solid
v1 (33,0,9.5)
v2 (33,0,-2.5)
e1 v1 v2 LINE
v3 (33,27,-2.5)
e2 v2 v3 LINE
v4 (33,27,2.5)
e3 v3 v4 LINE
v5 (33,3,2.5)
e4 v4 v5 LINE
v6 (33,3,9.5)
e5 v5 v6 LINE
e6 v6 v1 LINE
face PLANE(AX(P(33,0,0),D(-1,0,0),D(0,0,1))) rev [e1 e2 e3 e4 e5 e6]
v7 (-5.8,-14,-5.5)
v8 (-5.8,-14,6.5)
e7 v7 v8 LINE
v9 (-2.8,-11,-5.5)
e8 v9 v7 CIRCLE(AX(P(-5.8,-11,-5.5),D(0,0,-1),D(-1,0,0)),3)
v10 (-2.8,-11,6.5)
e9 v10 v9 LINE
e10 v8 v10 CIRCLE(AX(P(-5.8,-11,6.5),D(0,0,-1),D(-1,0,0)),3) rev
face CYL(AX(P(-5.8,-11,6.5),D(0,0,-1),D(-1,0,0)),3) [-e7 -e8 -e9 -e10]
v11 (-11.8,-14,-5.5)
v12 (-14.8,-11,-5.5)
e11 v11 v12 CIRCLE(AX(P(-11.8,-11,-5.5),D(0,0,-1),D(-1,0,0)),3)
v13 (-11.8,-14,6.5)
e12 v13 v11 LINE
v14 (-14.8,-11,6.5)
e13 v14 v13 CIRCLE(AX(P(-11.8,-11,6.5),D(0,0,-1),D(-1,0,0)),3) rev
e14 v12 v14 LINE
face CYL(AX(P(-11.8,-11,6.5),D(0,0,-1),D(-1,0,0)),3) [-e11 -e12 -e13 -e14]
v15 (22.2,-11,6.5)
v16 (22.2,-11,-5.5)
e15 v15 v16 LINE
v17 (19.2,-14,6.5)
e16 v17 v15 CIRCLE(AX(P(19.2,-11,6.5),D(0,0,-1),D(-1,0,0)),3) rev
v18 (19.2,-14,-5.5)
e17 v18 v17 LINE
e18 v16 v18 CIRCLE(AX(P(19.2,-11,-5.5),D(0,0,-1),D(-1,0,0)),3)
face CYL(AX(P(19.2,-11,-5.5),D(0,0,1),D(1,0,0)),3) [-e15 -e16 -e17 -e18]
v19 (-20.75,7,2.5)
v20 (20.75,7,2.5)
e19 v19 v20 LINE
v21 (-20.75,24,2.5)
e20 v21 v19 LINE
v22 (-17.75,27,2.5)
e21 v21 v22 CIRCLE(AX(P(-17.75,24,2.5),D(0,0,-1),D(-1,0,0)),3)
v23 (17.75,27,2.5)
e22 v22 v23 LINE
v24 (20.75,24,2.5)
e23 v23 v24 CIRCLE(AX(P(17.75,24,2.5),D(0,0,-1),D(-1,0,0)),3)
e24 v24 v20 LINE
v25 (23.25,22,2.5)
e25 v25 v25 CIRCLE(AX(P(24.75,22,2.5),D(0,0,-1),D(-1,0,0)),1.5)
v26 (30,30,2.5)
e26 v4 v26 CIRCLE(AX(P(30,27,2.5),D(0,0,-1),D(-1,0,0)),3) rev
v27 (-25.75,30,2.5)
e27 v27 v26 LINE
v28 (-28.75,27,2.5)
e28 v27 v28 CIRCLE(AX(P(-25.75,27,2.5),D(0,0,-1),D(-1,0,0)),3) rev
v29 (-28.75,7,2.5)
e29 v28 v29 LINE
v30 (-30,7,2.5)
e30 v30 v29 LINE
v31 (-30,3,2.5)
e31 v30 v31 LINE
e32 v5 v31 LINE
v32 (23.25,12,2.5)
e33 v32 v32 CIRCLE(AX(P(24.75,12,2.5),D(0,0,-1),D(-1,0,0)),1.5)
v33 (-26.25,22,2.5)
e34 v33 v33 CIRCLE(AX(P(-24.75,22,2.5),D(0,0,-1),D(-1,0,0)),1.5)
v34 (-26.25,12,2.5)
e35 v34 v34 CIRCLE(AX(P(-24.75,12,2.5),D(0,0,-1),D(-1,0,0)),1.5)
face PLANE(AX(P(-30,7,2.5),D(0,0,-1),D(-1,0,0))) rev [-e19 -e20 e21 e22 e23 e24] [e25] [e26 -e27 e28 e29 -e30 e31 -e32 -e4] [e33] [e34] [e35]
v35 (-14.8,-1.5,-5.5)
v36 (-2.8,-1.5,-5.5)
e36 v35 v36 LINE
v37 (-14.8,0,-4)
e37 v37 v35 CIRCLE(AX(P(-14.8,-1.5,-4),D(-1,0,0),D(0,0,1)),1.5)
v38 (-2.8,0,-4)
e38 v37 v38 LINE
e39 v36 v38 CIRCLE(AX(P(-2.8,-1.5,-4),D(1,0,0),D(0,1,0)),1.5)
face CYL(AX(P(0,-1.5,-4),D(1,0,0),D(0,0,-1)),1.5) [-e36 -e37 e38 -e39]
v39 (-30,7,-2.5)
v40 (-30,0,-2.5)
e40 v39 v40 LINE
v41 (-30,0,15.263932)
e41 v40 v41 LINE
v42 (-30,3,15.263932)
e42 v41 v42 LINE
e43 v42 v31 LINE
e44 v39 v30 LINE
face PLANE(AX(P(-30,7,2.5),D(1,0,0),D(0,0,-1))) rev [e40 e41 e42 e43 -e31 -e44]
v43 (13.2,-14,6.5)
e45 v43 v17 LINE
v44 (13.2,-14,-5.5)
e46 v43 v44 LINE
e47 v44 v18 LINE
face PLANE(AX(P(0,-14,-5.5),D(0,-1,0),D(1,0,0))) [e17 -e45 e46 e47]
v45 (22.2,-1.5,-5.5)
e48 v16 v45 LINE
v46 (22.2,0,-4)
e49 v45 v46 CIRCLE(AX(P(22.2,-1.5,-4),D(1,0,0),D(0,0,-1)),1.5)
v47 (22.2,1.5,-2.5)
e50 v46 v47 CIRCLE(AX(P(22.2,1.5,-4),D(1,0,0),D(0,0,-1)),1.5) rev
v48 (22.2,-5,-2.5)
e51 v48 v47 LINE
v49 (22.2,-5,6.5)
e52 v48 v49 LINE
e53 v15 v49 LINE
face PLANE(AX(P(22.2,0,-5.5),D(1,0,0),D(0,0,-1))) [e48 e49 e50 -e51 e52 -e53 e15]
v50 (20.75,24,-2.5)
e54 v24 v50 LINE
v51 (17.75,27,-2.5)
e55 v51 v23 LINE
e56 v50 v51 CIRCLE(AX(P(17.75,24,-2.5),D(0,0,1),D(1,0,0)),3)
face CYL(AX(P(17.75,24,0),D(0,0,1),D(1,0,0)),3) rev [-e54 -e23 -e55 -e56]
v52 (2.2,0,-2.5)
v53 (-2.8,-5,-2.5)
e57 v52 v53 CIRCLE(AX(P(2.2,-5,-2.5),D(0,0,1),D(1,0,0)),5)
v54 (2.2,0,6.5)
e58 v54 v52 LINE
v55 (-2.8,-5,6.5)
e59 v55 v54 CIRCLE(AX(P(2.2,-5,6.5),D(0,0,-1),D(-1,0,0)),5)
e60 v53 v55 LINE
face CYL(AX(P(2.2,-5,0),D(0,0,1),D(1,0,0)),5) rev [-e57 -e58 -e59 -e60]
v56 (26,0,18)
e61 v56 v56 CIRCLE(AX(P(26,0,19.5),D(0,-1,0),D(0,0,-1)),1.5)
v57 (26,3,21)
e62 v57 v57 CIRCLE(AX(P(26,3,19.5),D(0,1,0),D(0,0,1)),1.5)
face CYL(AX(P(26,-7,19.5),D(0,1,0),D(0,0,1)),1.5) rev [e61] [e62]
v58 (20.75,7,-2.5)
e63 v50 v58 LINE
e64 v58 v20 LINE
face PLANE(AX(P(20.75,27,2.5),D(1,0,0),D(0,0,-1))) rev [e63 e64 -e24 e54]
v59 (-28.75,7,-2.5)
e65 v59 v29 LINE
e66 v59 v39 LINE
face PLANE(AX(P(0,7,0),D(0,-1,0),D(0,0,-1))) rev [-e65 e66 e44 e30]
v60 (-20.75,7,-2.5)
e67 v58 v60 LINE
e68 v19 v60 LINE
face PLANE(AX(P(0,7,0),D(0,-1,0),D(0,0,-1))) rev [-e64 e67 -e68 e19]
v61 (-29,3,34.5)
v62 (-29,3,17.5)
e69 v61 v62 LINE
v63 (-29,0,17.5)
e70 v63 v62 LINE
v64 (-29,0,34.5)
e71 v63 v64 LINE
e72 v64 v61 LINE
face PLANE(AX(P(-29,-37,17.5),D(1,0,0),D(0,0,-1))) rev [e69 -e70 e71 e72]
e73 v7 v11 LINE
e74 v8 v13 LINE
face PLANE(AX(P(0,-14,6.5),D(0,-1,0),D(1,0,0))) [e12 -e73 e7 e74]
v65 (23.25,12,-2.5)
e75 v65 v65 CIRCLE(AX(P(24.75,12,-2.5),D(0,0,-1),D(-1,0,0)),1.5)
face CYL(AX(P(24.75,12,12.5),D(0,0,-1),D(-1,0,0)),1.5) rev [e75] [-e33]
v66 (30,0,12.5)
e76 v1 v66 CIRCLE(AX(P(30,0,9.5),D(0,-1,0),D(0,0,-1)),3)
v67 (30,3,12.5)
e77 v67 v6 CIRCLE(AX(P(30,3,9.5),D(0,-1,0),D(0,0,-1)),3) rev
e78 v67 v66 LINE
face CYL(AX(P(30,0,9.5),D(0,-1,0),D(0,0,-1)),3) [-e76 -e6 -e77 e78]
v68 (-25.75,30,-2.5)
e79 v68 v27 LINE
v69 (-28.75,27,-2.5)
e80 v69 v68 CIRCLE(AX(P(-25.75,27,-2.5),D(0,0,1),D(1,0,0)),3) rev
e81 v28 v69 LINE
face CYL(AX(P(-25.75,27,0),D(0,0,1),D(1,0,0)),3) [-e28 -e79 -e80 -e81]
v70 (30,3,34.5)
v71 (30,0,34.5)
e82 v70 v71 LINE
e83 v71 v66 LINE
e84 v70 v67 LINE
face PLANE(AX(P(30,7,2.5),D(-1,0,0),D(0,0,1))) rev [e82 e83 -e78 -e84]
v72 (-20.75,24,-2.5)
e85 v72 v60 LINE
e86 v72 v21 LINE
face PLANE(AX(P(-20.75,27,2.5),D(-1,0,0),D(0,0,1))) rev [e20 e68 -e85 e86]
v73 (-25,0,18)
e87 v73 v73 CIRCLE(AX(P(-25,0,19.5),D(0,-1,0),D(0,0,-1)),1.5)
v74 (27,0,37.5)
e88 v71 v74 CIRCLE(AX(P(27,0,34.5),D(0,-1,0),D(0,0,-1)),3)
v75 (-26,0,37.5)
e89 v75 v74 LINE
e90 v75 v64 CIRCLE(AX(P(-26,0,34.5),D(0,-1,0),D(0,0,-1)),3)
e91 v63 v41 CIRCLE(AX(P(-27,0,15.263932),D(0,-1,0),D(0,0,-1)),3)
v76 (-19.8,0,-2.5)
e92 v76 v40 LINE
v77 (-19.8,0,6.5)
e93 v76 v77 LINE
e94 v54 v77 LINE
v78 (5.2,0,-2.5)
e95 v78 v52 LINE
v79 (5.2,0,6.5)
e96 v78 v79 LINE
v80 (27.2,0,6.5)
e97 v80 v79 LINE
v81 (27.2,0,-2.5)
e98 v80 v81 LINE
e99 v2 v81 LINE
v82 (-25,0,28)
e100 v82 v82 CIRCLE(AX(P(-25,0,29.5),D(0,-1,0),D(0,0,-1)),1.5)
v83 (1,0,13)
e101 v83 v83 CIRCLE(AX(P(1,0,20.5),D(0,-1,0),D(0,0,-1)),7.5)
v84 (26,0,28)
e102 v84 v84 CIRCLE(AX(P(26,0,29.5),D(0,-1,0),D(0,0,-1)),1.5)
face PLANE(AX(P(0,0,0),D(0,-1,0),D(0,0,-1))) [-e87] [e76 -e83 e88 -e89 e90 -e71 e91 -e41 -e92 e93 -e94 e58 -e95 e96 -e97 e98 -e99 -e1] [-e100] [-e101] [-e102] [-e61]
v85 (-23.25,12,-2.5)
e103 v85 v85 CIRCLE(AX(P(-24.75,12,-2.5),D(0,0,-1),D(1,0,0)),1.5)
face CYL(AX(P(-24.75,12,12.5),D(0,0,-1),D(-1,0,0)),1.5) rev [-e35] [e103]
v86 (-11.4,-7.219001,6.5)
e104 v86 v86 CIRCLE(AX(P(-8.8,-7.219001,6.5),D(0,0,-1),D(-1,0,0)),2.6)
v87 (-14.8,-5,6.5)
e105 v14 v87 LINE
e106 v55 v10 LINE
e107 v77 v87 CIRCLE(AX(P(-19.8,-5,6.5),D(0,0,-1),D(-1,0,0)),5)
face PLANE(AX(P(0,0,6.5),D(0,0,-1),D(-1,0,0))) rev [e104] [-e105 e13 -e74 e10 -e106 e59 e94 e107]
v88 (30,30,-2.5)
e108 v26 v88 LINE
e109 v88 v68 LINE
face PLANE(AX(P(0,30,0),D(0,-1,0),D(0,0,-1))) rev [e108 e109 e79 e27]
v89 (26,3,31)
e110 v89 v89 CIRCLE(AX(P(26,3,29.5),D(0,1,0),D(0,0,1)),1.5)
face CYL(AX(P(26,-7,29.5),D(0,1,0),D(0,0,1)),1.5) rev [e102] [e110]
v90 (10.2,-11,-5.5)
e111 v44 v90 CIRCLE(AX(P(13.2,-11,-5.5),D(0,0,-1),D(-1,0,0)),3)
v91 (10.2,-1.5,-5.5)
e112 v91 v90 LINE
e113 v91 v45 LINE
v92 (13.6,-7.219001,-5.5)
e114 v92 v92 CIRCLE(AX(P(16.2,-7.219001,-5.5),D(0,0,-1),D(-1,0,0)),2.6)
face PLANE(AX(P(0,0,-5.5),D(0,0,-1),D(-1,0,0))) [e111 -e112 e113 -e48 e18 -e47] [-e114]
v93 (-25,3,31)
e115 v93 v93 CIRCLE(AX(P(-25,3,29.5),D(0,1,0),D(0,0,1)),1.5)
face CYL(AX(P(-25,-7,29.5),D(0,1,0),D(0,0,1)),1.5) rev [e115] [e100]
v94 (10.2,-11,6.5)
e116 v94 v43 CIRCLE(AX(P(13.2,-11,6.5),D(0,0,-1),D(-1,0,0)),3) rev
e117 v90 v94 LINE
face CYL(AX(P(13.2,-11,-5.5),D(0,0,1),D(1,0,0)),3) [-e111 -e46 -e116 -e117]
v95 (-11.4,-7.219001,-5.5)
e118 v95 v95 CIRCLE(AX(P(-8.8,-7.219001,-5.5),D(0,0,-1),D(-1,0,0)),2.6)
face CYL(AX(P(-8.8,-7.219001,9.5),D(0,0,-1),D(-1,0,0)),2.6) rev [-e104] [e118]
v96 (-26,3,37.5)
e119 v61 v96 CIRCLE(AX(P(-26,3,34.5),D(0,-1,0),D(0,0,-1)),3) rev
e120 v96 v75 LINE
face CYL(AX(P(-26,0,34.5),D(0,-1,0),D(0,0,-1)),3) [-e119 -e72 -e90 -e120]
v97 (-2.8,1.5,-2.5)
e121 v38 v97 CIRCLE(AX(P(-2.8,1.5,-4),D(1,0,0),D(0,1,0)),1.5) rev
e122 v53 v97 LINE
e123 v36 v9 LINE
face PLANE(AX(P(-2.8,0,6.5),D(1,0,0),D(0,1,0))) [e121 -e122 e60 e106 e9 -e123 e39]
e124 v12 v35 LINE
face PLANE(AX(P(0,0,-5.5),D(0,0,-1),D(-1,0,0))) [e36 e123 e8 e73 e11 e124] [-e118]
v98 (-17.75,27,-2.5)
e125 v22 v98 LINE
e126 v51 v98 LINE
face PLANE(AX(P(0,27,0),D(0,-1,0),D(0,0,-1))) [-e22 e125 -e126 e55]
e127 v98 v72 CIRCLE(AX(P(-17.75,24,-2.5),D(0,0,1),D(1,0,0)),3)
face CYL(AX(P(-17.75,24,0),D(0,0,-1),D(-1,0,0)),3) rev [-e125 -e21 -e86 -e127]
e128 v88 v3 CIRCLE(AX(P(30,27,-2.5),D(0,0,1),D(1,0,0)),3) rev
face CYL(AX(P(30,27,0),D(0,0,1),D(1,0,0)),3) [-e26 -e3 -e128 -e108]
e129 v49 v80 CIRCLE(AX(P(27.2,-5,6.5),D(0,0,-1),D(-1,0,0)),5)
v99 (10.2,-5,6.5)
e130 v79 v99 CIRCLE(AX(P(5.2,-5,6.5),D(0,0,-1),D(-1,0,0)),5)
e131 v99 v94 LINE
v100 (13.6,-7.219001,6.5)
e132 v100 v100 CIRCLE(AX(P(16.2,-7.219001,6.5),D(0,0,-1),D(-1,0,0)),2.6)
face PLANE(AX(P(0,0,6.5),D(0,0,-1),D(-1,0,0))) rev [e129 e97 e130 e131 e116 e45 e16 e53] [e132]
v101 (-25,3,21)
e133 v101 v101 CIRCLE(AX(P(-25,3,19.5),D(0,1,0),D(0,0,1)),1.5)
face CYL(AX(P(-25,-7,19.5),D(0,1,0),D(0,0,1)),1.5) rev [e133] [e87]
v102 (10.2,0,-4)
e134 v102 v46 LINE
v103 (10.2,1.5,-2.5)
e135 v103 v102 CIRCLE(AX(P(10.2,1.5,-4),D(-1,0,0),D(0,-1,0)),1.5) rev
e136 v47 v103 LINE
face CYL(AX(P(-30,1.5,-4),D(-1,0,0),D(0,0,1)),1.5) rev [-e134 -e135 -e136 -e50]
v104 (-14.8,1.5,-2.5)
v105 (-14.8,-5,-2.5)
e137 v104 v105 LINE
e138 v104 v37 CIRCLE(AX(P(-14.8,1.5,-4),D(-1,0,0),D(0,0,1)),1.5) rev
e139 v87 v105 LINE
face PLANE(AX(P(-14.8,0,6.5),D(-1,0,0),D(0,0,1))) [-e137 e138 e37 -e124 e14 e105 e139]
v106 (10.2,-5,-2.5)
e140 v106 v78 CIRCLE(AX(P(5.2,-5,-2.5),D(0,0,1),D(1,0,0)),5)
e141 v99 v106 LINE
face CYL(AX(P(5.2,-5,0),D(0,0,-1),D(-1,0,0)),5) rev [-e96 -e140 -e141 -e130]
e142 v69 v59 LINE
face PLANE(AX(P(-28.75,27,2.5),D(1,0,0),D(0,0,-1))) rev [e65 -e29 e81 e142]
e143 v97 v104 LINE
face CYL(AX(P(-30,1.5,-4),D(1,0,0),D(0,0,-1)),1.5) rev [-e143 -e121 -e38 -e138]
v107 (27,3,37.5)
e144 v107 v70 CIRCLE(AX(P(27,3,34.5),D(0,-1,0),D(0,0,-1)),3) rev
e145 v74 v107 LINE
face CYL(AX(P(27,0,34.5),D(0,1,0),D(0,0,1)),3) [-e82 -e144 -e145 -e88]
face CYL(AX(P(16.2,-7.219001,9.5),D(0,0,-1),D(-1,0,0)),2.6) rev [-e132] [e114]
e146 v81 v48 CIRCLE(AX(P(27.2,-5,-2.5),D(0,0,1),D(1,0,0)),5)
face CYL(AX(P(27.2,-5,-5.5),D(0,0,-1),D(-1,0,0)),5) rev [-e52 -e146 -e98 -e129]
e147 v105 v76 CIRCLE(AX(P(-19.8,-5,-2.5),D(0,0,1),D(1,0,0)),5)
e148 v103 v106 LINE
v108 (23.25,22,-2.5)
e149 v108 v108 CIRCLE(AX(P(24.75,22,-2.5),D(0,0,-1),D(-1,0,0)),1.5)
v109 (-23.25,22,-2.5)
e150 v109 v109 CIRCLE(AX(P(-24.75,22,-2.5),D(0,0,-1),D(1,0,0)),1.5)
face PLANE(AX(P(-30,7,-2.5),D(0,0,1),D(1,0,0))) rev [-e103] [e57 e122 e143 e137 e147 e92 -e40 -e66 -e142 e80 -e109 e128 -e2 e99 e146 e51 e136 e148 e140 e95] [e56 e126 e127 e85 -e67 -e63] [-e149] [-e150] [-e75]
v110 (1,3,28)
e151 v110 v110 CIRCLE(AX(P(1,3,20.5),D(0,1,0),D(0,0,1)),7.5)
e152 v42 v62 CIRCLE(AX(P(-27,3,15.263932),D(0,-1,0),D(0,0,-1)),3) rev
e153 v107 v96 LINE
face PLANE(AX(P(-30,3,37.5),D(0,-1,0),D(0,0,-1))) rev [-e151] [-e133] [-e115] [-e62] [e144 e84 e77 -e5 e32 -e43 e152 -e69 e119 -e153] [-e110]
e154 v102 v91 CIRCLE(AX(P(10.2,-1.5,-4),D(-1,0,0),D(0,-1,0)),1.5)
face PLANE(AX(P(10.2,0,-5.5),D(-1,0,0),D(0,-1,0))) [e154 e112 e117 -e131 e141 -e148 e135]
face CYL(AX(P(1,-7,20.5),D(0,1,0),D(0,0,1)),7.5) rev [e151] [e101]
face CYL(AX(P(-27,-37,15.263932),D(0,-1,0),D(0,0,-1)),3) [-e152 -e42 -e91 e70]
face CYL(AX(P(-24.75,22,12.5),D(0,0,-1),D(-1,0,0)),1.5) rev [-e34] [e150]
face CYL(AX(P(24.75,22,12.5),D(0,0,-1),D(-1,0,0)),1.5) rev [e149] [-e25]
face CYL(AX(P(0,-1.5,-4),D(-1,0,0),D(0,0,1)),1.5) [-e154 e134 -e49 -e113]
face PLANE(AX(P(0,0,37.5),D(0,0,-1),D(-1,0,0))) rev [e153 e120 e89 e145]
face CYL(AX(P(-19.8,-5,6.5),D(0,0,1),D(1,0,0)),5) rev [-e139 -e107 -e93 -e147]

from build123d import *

# Parameters (mm, degrees)
SKETCH_1_W           = 60
SKETCH_1_H           = 5
EXTRUDE_1_DEPTH      = 7
SKETCH_2_W           = 8
SKETCH_2_H           = 5
EXTRUDE_2_DEPTH      = 20
SKETCH_3_R           = 1.5
CUT_EXTRUDE_1_DEPTH  = 15
SKETCH_6_W           = 60
SKETCH_6_H           = 3
EXTRUDE_3_DEPTH      = 35
SKETCH_7_W           = 1
SKETCH_7_H           = 20
CUT_EXTRUDE_2_DEPTH  = 40
SKETCH_8_R           = 1.5
SKETCH_8_R_2         = 7.5
CUT_EXTRUDE_3_DEPTH  = 10
EXTRUDE_4_DEPTH      = 3
EXTRUDE_4_DEPTH_BACK = 9
SKETCH_9_W           = 12
SKETCH_9_H           = 14
SKETCH_9_R           = 2.5
FILLET_3_R           = 3
SKETCH_12_W          = 57.5
SKETCH_12_H          = 5
EXTRUDE_6_DEPTH      = 3
FILLET_6_R           = 3
FILLET_7_R           = 1.5
FILLET_8_R           = 5
FILLET_9_R           = 3
FILLET_10_R          = 3
SKETCH_14_W          = 1.25
SKETCH_14_H          = 5
EXTRUDE_7_DEPTH      = 23
EXTRUDE_8_DEPTH      = 3
FILLET_12_R          = 3
SKETCH_17_R          = 2.6
CUT_EXTRUDE_4_DEPTH  = 15


# Some blends are built 0.0001 mm under size
with BuildPart() as part:
    # 草图1 → 凸台-拉伸1 (new body)
    with BuildSketch(Plane(origin=(0, 0, 0), x_dir=(1, 0, 0), z_dir=(0, 1, 0))):
        Rectangle(SKETCH_1_W, SKETCH_1_H)
    extrude(amount=EXTRUDE_1_DEPTH)

    # 草图2 → 凸台-拉伸2 (add)
    with BuildSketch(Plane(origin=(0, 7, 0), x_dir=(1, 0, 0), z_dir=(0, 1, 0))):
        with Locations((24.75, 0)):
            Rectangle(SKETCH_2_W, SKETCH_2_H)
        with Locations((-24.75, 0)):
            Rectangle(SKETCH_2_W, SKETCH_2_H)
    extrude(amount=EXTRUDE_2_DEPTH)

    # 草图3 → 切除-拉伸1 (cut)
    with BuildSketch(Plane(origin=(0, 0, -2.5), x_dir=(-1, 0, 0), z_dir=(0, 0, -1))):
        with Locations((-24.75, 22)):
            Circle(SKETCH_3_R)
        with Locations((-24.75, 12)):
            Circle(SKETCH_3_R)
        with Locations((24.75, 12)):
            Circle(SKETCH_3_R)
        with Locations((24.75, 22)):
            Circle(SKETCH_3_R)
    extrude(amount=-CUT_EXTRUDE_1_DEPTH, mode=Mode.SUBTRACT)

    # 草图6 → 凸台-拉伸3 (add)
    with BuildSketch(Plane.XY.offset(2.5)):
        with Locations((0, 1.5)):
            Rectangle(SKETCH_6_W, SKETCH_6_H)
    extrude(amount=EXTRUDE_3_DEPTH)

    # 草图7 → 切除-拉伸2 (cut)
    with BuildSketch(Plane(origin=(0, 3, 0), x_dir=(1, 0, 0), z_dir=(0, 1, 0))):
        with Locations((-29.5, -27.5)):
            Rectangle(SKETCH_7_W, SKETCH_7_H)
    extrude(amount=-CUT_EXTRUDE_2_DEPTH, mode=Mode.SUBTRACT)

    # 草图8 → 切除-拉伸3 (cut)
    with BuildSketch(Plane(origin=(0, 3, 0), x_dir=(1, 0, 0), z_dir=(0, 1, 0))):
        with Locations(Location((-25, -19.5, 0), (0, 0, 270))):
            Circle(SKETCH_8_R)
        with Locations(Location((-25, -29.5, 0), (0, 0, 270))):
            Circle(SKETCH_8_R)
        with Locations(Location((26, -29.5, 0), (0, 0, 270))):
            Circle(SKETCH_8_R)
        with Locations(Location((26, -19.5, 0), (0, 0, 270))):
            Circle(SKETCH_8_R)
        with Locations(Location((1, -20.5, 0), (0, 0, 270))):
            Circle(SKETCH_8_R_2)
    extrude(amount=-CUT_EXTRUDE_3_DEPTH, mode=Mode.SUBTRACT)

    # 草图9 → 凸台-拉伸4 (add, two sides: drawn at the far end of the back side and taken through both)
    # profile 1 of 2: a face of its own
    with BuildSketch(Plane(origin=(0, 0, -2.5), x_dir=(-1, 0, 0), z_dir=(0, 0, -1)).offset(-EXTRUDE_4_DEPTH_BACK)):
        with Locations((-16.2, -7)):
            Rectangle(SKETCH_9_W, SKETCH_9_H)
        with Locations((-16.2, -7.219000805)):
            Circle(SKETCH_9_R, mode=Mode.SUBTRACT)
    # profile 2 of 2: a face of its own
    with BuildSketch(Plane(origin=(0, 0, -2.5), x_dir=(-1, 0, 0), z_dir=(0, 0, -1)).offset(-EXTRUDE_4_DEPTH_BACK)):
        with Locations((8.8, -7)):
            Rectangle(SKETCH_9_W, SKETCH_9_H)
        with Locations((8.8, -7.219000805)):
            Circle(SKETCH_9_R, mode=Mode.SUBTRACT)
    extrude(amount=EXTRUDE_4_DEPTH + EXTRUDE_4_DEPTH_BACK)

    # 圆角3
    # the kernel refuses this fillet: 3 mm, written as the material it takes off along each edge
    with BuildSketch(Plane(origin=(-30, 8.590169944, 17.5), x_dir=(0, 0, -1), z_dir=(0, -1, 0))) as fillet_3_piece_1:
        with BuildLine():
            CenterArc((2.236067977, 3), FILLET_3_R, 221.810314896, 48.189685104)
            Line((0, 1), (-0.04472136, 0.96))
            ThreePointArc((-0.04472136, 0.96), (-0.06, 0.5), (-0.06, 0))
            Line((-0.06, 0), (0, -0.06))
            Line((0, -0.06), (2.236067977, -0.06))
            Line((2.236067977, -0.06), (2.236067977, 0))
        make_face()
    extrude(amount=14.180339887, mode=Mode.SUBTRACT)

    # 草图12 → 凸台-拉伸6 (add)
    with BuildSketch(Plane(origin=(0, 27, 0), x_dir=(1, 0, 0), z_dir=(0, 1, 0))):
        Rectangle(SKETCH_12_W, SKETCH_12_H)
    extrude(amount=EXTRUDE_6_DEPTH)

    # 圆角6
    fillet_6_edges = [part.edges().sort_by_distance(p)[0] for p in [
        (-28.75, 30, 0),
        (20.75, 27, 0),
        (-20.75, 27, 0),
    ]]
    fillet(fillet_6_edges, radius=FILLET_6_R)

    # 圆角7
    fillet_7_edges = [part.edges().sort_by_distance(p)[0] for p in [
        (16.2, 0, -2.5),
        (-8.8, 0, -2.5),
    ]]
    fillet(fillet_7_edges, radius=FILLET_7_R)
    fillet_7_2_edges = [part.edges().sort_by_distance(p)[0] for p in [
        (-8.8, 0, -5.5),
        (16.2, 0, -5.5),
    ]]
    fillet(fillet_7_2_edges, radius=FILLET_7_R - 0.0001)  # a hair under: the kernel refuses the full size

    # 圆角8
    fillet_8_edges = [part.edges().sort_by_distance(p)[0] for p in [
        (22.2, 0, 2),
        (10.2, 0, 2),
        (-2.8, 0, 2),
        (-14.8, 0, 2),
    ]]
    fillet(fillet_8_edges, radius=FILLET_8_R)

    # 圆角9
    fillet_9_edges = [part.edges().sort_by_distance(p)[0] for p in [
        (22.2, -14, 0.5),
        (10.2, -14, 0.5),
        (-14.8, -14, 0.5),
        (-2.8, -14, 0.5),
    ]]
    fillet(fillet_9_edges, radius=FILLET_9_R)

    # 圆角10
    fillet_10_edges = [part.edges().sort_by_distance(p)[0] for p in [
        (30, 1.5, 37.5),
        (-29, 1.5, 37.5),
    ]]
    fillet(fillet_10_edges, radius=FILLET_10_R)

    # 草图14 → 凸台-拉伸7 (add)
    with BuildSketch(Plane(origin=(0, 7, 0), x_dir=(1, 0, 0), z_dir=(0, 1, 0))):
        with Locations((29.375, 0)):
            Rectangle(SKETCH_14_W, SKETCH_14_H)
    extrude(amount=EXTRUDE_7_DEPTH)

    # 草图16 → 凸台-拉伸8 (add)
    with BuildSketch(Plane(origin=(30, 0, 0), x_dir=(0, 0, -1), z_dir=(1, 0, 0))):
        Polygon((-12.5, 0), (-12.5, 3), (-2.5, 3), (-2.5, 30), (2.5, 30), (2.5, 0), align=None)
    extrude(amount=EXTRUDE_8_DEPTH)

    # 圆角12
    fillet_12_edges = [part.edges().sort_by_distance(p)[0] for p in [
        (33, 1.5, 12.5),
        (33, 30, 0),
    ]]
    fillet(fillet_12_edges, radius=FILLET_12_R - 0.0001)  # a hair under: the kernel refuses the full size

    # 草图17 → 切除-拉伸4 (cut)
    with BuildSketch(Plane(origin=(0, 0, -5.5), x_dir=(-1, 0, 0), z_dir=(0, 0, -1))):
        with Locations((-16.2, -7.219000805)):
            Circle(SKETCH_17_R)
        with Locations((8.8, -7.219000805)):
            Circle(SKETCH_17_R)
    extrude(amount=-CUT_EXTRUDE_4_DEPTH, mode=Mode.SUBTRACT)


solid = part.part
